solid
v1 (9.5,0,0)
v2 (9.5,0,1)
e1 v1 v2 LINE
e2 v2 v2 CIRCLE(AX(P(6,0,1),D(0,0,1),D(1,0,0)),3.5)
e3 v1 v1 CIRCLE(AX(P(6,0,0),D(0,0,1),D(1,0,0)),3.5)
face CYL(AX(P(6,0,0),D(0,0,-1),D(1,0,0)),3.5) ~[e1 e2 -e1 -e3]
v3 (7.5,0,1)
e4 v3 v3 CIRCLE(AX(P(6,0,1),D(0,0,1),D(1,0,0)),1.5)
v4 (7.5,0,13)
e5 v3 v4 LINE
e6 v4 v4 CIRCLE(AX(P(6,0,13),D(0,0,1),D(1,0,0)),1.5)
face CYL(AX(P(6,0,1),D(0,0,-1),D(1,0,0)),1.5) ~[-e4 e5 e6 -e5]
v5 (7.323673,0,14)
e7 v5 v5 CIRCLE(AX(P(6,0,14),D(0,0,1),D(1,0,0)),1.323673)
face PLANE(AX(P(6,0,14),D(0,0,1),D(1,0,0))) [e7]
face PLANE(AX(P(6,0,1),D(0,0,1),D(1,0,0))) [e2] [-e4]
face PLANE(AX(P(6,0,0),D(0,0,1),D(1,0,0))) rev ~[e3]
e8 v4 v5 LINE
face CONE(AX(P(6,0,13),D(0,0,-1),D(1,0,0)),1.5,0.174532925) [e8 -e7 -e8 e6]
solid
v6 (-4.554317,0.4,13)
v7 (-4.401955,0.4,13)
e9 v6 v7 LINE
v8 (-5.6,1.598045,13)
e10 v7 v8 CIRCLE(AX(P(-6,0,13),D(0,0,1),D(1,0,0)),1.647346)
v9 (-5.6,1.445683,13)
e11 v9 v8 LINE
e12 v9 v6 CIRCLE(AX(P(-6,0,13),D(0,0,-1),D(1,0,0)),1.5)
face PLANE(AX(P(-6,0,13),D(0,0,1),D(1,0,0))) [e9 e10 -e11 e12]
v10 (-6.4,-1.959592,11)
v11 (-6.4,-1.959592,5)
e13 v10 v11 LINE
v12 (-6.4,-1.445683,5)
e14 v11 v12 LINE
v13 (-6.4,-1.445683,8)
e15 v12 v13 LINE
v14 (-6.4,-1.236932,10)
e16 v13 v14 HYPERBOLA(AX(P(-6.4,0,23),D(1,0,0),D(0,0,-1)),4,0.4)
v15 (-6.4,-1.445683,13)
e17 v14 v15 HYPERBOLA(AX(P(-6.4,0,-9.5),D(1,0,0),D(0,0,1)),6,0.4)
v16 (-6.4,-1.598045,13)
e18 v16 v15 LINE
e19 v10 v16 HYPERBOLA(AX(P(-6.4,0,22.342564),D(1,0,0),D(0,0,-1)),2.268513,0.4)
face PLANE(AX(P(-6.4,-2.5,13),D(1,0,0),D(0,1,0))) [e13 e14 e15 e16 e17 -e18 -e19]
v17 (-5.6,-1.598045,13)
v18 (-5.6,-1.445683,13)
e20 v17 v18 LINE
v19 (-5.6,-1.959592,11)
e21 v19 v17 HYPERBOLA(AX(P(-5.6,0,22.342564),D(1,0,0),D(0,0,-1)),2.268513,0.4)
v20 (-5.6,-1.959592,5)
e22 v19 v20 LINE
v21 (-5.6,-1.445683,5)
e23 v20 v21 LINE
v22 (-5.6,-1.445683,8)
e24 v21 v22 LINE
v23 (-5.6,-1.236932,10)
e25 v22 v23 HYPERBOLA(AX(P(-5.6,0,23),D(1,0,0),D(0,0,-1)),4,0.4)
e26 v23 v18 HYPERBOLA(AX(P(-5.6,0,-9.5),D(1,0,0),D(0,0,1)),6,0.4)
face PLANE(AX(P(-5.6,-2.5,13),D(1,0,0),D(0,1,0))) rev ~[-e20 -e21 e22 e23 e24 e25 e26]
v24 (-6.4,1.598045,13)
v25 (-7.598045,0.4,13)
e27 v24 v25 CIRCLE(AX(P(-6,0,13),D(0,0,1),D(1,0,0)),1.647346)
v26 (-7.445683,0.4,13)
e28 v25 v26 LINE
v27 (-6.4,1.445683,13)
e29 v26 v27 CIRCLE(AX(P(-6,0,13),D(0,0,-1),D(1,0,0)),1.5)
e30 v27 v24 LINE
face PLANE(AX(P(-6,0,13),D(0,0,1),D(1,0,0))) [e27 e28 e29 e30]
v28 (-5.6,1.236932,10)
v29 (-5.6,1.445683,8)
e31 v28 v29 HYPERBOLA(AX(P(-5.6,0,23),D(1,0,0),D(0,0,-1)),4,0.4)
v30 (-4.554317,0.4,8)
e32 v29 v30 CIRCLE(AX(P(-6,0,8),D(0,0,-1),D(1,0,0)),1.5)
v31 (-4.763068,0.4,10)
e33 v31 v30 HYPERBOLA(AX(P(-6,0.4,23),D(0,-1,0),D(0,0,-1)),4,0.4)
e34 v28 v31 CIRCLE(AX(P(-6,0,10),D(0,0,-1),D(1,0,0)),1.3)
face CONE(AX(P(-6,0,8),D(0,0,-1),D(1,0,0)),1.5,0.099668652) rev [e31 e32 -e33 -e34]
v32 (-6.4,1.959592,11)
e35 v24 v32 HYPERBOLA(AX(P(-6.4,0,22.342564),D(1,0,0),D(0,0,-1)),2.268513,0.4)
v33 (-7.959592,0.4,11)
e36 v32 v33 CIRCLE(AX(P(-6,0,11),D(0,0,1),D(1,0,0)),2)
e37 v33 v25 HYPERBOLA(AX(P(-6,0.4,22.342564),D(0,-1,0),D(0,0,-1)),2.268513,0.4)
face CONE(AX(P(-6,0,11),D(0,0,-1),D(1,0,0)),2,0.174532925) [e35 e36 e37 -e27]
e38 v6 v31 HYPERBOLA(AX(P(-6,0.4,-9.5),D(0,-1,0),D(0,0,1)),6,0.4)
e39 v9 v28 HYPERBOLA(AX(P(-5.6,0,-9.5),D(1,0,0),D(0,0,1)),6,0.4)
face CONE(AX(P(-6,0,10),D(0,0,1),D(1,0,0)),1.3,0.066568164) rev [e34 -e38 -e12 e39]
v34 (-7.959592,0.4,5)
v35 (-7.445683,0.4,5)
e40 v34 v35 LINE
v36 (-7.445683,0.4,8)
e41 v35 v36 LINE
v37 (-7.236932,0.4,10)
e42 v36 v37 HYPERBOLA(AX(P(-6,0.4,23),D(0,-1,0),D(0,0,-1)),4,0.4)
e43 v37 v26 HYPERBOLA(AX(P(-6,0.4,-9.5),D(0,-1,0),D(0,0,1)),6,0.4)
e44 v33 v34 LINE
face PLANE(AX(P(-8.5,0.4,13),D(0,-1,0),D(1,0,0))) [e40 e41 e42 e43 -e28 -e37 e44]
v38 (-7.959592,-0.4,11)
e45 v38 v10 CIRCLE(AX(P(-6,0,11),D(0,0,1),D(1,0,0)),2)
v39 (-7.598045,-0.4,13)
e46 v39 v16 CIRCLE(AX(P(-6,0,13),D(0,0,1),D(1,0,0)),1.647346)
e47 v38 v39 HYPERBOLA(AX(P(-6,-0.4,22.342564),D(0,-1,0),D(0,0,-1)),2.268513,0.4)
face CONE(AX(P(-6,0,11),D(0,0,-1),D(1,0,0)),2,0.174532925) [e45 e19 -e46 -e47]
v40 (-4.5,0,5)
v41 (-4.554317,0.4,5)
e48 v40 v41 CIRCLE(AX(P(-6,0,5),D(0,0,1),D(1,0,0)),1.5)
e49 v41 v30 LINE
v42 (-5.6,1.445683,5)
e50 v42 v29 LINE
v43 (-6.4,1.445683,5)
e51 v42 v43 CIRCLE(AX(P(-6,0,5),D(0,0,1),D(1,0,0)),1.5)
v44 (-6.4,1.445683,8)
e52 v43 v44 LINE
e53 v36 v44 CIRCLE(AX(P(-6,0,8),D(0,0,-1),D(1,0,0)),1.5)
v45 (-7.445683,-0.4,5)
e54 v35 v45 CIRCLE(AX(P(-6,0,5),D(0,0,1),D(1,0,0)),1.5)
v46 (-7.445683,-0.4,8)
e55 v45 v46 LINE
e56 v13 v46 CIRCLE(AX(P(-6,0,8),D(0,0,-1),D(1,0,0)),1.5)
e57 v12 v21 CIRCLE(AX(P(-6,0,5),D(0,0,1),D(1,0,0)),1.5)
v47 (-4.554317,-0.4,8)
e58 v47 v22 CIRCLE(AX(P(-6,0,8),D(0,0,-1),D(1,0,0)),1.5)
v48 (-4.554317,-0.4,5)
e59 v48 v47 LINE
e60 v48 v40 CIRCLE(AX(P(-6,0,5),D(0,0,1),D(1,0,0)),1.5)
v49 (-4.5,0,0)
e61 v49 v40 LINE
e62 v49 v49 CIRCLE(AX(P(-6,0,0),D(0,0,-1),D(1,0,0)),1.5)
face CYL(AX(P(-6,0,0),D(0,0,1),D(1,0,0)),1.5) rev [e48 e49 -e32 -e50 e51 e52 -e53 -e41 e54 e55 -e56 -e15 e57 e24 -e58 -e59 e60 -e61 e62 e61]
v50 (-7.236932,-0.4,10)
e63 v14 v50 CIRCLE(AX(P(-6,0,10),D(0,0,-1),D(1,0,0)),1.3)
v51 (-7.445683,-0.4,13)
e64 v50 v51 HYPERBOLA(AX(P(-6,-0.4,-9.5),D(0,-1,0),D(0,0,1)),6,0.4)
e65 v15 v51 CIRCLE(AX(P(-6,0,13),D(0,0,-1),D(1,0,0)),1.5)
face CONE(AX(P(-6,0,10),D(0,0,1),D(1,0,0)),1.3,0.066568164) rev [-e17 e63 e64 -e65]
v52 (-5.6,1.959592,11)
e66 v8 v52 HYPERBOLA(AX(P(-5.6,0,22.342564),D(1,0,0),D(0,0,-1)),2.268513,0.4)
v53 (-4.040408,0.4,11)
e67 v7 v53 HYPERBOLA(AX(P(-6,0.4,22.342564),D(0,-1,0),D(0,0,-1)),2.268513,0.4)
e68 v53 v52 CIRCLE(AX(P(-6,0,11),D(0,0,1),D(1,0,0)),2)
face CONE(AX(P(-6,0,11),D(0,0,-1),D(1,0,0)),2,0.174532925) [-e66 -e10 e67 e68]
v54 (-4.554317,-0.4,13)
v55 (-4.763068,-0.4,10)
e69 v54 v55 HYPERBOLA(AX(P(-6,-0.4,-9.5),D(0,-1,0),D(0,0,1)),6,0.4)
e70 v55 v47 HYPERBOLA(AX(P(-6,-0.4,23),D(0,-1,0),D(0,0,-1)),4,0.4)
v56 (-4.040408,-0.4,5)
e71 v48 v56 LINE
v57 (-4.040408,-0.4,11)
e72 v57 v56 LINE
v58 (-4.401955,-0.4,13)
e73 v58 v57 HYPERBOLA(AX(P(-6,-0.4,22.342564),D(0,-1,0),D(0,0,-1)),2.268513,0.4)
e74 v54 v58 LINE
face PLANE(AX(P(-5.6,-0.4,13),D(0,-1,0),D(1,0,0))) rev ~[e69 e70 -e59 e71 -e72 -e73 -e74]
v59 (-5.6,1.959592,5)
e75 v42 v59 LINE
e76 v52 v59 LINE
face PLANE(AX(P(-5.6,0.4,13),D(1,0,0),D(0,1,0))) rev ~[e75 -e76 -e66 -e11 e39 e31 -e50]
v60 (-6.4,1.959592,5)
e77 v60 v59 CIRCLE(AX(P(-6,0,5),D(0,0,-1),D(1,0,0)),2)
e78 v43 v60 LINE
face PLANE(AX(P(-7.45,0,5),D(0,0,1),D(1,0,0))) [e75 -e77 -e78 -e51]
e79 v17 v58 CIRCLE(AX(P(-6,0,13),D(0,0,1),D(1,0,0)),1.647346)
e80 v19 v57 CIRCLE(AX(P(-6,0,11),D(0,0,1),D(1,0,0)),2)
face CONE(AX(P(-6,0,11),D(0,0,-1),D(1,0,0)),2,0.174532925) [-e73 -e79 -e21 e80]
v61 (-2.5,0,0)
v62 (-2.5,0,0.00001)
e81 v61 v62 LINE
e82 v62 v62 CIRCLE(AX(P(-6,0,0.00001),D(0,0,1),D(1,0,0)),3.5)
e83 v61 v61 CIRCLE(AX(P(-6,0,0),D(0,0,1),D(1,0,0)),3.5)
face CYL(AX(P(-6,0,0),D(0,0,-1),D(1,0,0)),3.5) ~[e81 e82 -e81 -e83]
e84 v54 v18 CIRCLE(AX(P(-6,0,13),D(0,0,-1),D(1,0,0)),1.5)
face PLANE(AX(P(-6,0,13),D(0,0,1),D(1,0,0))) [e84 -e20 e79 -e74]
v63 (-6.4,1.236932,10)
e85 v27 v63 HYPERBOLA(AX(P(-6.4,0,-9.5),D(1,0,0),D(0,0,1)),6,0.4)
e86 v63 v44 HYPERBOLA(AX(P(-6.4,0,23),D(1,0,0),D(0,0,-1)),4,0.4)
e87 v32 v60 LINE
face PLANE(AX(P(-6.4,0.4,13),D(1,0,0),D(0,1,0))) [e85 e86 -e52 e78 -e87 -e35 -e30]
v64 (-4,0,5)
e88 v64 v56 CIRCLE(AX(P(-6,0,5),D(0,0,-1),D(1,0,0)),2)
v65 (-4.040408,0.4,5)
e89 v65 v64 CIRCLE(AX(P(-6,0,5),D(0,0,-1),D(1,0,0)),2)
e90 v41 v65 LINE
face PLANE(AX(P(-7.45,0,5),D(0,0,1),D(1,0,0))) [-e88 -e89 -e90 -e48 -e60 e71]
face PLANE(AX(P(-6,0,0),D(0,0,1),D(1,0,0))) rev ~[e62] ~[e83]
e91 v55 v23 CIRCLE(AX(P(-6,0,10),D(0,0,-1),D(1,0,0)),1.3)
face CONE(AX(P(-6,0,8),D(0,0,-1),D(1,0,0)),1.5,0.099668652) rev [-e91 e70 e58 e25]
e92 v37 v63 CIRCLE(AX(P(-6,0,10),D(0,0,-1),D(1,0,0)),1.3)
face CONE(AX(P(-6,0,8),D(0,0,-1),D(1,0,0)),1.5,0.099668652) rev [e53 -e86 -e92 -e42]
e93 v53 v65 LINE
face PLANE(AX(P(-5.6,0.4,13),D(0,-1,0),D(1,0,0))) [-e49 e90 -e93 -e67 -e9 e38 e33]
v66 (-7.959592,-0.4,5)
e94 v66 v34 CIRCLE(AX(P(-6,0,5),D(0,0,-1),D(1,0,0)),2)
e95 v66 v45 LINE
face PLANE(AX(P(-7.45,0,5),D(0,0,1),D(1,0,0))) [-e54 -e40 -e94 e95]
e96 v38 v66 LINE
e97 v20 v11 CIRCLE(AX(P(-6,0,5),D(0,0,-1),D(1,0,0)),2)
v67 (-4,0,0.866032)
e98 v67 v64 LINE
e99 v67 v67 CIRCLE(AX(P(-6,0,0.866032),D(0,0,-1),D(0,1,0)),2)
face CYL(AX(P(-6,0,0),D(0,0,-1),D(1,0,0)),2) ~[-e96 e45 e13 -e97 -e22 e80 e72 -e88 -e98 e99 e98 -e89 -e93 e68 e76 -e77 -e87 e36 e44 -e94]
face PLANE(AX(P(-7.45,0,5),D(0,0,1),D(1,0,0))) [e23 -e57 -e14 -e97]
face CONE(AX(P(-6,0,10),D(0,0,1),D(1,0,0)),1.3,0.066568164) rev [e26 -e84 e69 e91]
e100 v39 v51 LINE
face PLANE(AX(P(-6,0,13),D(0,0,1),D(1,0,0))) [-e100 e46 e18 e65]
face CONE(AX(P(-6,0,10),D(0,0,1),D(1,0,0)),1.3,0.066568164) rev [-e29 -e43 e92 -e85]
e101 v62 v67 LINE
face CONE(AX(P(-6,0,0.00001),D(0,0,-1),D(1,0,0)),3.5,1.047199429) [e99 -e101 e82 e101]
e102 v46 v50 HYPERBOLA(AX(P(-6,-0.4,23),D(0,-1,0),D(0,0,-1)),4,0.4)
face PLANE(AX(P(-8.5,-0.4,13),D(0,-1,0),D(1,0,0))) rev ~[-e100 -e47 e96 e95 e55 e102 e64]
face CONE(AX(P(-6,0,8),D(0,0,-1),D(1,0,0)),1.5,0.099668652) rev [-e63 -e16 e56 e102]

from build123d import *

# Parameters (mm, degrees)
F0_R      = 3.5
F1_DEPTH  = 1
F2_SIZE2  = 1.732041
F2_SIZE   = 0.99999
F3_R      = 2
F4_DEPTH  = 13
F5_SIZE2  = 0.3526539614
F5_SIZE   = 2
F8_R      = 1.5
F9_DEPTH  = 13
F10_SIZE2 = 0.1763269807
F10_SIZE  = 1
F11_W     = 2.1
F11_H     = 0.8
F11_W_2   = 0.8
F11_H_2   = 2.1
F12_DEPTH = 8


# Not quite as in the source:
# - a fillet or chamfer is up to 0.001 mm smaller than in the source, because OpenCascade refuses the exact size


with BuildPart() as f1:
    # F0 (on Top) → F1 (new body)
    with BuildSketch(Plane.XY):
        with Locations((-6, 0)):
            Circle(F0_R)
    extrude(amount=F1_DEPTH)

    # F2 (size 1 and 1.7320508076 in the source; OpenCascade refuses exactly that, so slightly less here)
    f2_edges = [f1.edges().sort_by_distance(p)[0] for p in [
        (-9.5, 0, 1),
    ]]
    f2_side = f1.faces().sort_by_distance((-9.5, 0, 0.5))[0]
    chamfer(f2_edges, length=F2_SIZE, length2=F2_SIZE2, reference=f2_side)

    # F3 (on Top) → F4 (join)
    with BuildSketch(Plane.XY):
        with Locations((-6, 0)):
            Circle(F3_R)
    extrude(amount=F4_DEPTH)

    # F5
    f5_edges = [f1.edges().sort_by_distance(p)[0] for p in [
        (-8, 0, 13),
    ]]
    f5_side = f1.faces().sort_by_distance((-8, 0, 6.933016))[0]
    chamfer(f5_edges, length=F5_SIZE, length2=F5_SIZE2, reference=f5_side)

    # F6 (on Front) → F7 (revolve, cut)
    with BuildSketch(Plane.XZ):
        Polygon((-4.5, 13), (-6, 13), (-6, 0), (-4.5, 0), (-4.5, 8), (-4.7, 10), align=None)
    revolve(axis=Axis((-6, 0, 6.5), (0, 0, -1)), mode=Mode.SUBTRACT)

    # F11 (on face) → F12 (cut)
    with BuildSketch(Plane.XY.offset(13)):
        with Locations((-7.45, 0)):
            Rectangle(F11_W, F11_H)
        with Locations((-6, 1.45)):
            Rectangle(F11_W_2, F11_H_2)
        with Locations((-6, 0)):
            Rectangle(F11_W_2, F11_H)
        with Locations((-4.55, 0)):
            Rectangle(F11_W, F11_H)
        with Locations((-6, -1.45)):
            Rectangle(F11_W_2, F11_H_2)
    extrude(amount=-F12_DEPTH, mode=Mode.SUBTRACT)


with BuildPart() as f1b:
    # F0 (on Top) → F1, piece 2 (new body)
    with BuildSketch(Plane.XY):
        with Locations((6, 0)):
            Circle(F0_R)
    extrude(amount=F1_DEPTH)

    # F8 (on face) → F9 (join)
    with BuildSketch(Plane.XY.offset(1)):
        with Locations((6, 0)):
            Circle(F8_R)
    extrude(amount=F9_DEPTH)

    # F10
    f10_edges = [f1b.edges().sort_by_distance(p)[0] for p in [
        (4.5, 0, 14),
    ]]
    f10_side = f1b.faces().sort_by_distance((4.5, 0, 7.5))[0]
    chamfer(f10_edges, length=F10_SIZE, length2=F10_SIZE2, reference=f10_side)


solid = Compound([f1.part, f1b.part])
